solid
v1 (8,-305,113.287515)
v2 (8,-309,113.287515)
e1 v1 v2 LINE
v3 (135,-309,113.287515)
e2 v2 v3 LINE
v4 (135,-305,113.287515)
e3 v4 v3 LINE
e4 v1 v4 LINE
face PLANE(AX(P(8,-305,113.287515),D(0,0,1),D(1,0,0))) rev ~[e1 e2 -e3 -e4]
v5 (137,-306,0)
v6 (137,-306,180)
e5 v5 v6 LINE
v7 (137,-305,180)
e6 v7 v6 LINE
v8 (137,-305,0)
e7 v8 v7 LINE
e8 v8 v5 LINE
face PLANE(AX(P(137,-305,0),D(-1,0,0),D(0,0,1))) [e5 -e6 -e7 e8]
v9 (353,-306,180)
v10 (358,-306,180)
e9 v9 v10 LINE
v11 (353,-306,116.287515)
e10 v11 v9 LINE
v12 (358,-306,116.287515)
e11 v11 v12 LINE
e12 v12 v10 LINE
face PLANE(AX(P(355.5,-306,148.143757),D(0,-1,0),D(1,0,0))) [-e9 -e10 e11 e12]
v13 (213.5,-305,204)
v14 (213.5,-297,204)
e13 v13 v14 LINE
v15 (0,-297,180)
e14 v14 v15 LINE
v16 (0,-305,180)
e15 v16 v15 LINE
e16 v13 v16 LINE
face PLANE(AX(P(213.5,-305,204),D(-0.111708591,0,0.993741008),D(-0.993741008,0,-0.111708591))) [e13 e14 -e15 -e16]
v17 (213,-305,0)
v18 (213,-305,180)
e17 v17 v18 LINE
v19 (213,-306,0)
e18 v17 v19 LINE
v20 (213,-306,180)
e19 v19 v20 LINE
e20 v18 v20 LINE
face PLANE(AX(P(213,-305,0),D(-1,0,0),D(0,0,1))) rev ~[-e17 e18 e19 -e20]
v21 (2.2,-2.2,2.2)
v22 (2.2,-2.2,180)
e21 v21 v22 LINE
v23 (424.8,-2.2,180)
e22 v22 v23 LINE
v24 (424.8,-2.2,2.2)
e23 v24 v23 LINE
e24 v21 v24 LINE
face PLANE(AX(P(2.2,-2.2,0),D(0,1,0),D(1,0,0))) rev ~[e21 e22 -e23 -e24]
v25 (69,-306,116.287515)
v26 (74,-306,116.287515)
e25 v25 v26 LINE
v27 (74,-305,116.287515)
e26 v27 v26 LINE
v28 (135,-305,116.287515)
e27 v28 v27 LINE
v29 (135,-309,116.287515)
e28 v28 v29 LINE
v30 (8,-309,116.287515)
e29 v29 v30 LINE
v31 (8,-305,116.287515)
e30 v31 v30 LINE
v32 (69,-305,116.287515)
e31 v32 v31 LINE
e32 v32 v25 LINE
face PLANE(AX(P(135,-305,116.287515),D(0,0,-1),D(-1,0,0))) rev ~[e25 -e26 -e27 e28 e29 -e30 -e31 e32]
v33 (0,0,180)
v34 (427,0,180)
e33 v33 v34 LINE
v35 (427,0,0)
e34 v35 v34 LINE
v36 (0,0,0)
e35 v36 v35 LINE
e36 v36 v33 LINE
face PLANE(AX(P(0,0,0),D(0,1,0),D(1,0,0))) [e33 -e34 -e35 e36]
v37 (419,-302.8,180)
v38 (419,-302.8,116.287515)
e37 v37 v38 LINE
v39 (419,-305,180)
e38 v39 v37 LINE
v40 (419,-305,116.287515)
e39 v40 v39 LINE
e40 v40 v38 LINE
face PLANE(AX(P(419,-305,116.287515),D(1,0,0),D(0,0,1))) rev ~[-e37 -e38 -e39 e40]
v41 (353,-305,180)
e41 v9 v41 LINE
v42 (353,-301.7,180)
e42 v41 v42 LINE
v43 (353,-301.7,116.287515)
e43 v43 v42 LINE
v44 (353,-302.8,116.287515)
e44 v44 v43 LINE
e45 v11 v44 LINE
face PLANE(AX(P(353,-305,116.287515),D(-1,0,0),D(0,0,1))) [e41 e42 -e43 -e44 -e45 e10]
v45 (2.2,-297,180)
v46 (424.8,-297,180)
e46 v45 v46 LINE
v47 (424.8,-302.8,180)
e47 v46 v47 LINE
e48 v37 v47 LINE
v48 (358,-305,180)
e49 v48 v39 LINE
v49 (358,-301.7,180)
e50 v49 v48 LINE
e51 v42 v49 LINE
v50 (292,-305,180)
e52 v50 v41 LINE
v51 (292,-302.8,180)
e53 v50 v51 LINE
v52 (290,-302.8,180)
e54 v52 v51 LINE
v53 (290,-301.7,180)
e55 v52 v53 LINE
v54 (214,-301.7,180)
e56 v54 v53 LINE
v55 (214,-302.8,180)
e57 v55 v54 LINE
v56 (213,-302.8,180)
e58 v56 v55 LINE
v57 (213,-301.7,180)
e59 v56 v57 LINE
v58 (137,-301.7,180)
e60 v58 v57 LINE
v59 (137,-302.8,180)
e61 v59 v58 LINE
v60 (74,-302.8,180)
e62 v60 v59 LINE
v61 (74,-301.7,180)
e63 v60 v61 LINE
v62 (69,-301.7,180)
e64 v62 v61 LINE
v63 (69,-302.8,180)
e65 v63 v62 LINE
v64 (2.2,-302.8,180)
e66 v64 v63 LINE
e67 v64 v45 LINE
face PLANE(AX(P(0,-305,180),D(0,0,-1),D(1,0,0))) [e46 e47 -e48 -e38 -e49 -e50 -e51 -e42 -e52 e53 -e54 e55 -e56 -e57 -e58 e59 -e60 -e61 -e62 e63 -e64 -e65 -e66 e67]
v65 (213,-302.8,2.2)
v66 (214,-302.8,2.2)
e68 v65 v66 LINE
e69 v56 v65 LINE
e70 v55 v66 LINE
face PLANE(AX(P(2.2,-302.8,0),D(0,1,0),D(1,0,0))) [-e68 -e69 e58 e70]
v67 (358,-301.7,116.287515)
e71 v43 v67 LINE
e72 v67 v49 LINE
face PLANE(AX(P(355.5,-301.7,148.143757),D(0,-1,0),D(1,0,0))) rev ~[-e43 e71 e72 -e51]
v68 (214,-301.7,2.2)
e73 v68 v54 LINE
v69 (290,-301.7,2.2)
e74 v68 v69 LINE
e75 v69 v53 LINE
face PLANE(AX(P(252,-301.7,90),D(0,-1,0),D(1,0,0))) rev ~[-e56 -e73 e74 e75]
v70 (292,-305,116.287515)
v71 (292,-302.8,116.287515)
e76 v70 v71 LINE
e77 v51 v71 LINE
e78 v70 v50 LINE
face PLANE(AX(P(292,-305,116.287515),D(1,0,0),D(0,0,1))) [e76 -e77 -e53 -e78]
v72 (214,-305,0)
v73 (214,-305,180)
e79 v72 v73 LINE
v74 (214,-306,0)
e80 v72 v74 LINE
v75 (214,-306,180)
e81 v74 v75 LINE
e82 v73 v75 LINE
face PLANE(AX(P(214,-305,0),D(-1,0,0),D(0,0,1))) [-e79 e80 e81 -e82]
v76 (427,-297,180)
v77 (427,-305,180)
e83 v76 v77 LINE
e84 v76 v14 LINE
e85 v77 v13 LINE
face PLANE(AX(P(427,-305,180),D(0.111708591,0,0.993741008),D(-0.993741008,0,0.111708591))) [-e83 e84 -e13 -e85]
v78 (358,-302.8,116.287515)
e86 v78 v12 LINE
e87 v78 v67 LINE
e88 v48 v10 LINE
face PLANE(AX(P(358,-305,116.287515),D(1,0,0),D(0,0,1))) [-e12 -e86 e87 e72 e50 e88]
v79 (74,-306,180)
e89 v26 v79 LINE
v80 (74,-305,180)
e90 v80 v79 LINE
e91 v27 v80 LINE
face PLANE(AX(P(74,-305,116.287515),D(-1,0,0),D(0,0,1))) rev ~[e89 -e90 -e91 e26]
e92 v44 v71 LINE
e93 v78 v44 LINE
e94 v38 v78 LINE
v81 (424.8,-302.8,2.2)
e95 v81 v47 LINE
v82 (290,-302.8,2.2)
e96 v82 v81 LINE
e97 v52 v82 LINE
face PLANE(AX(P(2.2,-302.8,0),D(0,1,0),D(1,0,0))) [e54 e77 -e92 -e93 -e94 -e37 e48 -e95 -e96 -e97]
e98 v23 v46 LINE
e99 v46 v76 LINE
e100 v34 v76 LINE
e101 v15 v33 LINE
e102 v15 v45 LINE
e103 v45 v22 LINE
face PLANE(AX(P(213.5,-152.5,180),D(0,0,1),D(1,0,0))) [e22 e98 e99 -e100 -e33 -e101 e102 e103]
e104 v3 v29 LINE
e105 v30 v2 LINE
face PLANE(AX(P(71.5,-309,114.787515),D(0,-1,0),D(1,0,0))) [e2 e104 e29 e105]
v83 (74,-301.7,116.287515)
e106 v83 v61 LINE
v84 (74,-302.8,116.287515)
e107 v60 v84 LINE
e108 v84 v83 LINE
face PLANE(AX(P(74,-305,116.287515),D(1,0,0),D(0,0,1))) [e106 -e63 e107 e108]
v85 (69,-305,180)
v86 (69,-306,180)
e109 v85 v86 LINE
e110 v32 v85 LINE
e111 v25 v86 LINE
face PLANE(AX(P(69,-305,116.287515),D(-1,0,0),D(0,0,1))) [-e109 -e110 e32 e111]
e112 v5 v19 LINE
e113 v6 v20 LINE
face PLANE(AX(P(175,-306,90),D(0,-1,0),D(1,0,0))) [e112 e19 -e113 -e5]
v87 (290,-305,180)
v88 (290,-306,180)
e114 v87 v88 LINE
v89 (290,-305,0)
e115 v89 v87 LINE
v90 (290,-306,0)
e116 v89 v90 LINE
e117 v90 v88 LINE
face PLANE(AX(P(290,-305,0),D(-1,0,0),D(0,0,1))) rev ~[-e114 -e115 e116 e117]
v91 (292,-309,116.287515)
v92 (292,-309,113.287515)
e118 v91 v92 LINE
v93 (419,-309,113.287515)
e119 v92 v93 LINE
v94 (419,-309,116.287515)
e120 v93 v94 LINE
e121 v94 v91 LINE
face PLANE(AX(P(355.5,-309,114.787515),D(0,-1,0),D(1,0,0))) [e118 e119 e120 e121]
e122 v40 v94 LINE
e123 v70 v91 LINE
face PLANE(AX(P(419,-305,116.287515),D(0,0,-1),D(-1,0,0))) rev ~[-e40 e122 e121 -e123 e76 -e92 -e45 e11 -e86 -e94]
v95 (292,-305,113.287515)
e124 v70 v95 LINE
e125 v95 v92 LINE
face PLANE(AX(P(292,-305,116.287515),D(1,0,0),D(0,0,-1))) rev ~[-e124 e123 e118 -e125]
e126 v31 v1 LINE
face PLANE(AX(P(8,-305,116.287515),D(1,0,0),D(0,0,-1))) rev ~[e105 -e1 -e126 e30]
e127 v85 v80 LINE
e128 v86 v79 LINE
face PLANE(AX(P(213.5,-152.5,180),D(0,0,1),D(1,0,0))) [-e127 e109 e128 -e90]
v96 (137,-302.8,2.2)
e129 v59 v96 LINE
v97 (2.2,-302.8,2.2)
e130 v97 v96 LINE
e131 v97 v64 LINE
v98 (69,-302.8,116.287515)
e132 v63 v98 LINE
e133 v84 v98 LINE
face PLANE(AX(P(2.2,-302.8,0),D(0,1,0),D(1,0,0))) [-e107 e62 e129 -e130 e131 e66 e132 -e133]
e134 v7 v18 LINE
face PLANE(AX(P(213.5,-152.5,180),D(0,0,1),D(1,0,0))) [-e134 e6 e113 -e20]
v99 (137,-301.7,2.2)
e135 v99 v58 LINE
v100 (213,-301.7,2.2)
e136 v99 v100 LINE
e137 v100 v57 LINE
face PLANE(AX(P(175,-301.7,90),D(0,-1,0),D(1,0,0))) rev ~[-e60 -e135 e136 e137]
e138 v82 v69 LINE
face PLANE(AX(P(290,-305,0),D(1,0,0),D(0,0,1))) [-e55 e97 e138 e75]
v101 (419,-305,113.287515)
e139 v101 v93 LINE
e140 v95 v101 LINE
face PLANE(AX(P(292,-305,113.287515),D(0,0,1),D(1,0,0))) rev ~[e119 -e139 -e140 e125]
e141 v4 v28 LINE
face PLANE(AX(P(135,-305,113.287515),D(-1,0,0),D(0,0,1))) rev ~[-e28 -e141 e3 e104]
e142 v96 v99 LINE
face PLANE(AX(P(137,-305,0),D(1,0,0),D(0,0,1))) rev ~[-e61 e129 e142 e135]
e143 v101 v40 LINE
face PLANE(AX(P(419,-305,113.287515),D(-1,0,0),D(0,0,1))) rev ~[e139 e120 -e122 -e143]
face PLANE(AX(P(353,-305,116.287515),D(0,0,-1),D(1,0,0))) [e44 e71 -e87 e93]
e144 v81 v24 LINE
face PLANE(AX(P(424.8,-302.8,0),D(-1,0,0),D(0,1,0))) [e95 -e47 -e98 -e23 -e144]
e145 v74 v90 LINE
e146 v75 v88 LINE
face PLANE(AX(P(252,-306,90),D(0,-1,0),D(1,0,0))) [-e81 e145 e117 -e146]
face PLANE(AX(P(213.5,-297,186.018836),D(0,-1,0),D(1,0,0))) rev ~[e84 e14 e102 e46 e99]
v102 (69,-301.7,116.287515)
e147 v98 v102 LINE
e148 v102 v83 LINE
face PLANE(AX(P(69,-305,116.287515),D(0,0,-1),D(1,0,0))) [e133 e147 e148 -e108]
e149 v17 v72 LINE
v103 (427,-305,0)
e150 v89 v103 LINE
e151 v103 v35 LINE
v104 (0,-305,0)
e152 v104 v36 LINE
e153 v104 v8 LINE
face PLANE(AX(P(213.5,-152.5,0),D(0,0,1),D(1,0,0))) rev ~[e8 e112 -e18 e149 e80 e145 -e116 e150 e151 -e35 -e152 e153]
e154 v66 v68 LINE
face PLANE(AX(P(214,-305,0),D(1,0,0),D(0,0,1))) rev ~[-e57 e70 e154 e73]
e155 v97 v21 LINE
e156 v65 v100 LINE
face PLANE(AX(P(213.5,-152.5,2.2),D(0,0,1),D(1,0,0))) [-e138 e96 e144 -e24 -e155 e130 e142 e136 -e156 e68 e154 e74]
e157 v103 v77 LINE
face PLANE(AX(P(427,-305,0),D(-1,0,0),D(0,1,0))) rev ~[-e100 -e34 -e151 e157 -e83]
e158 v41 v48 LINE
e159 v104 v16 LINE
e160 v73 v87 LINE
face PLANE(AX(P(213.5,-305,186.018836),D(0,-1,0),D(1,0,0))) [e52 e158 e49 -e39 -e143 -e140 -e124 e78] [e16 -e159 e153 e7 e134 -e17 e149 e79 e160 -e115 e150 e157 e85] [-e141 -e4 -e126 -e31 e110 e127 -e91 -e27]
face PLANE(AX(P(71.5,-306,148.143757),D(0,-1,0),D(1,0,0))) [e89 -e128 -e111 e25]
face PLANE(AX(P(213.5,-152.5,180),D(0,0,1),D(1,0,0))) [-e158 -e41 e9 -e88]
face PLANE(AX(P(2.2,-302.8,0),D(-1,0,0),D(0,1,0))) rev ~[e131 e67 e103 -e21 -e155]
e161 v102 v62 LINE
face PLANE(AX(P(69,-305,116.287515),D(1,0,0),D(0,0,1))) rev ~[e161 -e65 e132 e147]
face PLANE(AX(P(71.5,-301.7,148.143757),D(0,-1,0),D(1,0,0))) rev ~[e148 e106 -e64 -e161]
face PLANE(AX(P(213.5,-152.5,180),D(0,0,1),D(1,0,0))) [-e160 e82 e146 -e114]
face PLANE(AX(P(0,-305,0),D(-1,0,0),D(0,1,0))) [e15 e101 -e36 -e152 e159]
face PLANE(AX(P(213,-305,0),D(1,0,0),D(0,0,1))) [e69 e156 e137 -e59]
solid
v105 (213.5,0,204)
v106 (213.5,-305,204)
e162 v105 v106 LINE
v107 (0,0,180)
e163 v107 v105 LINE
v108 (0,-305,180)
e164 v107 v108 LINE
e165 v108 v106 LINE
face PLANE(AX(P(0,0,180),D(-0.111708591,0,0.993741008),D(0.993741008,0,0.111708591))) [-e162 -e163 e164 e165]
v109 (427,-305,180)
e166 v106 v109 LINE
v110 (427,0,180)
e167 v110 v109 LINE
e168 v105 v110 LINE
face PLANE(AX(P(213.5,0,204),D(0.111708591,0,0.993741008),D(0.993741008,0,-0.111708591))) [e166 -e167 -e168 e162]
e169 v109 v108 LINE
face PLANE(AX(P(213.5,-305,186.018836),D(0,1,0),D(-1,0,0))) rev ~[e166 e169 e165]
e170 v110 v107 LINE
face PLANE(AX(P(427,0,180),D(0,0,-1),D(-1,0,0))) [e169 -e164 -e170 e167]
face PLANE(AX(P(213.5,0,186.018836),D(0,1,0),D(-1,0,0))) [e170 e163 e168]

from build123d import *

# Parameters (mm, degrees)
F0_W          = 427
F0_H          = 305
F0_W_2        = 422.6
F0_H_2        = 300.6
F1_DEPTH      = 180
F2_DEPTH      = 2.2
F3_W          = 76
F3_H          = 180
F3_W_2        = 5
F3_H_2        = 63.7124854326
F4_DEPTH      = 1
F4_DEPTH_BACK = 3.3
F3_W_3        = 61
F5_DEPTH      = 25
F6_DEPTH      = 8
F7_DEPTH      = 4
F9_DEPTH      = 305


# Not quite as in the source:
# - a feature names something its author has since deleted; it is built from what else it names
# - the program builds the solid bodies; features that only make, move or delete a surface that nothing else refers to are left out


with BuildPart() as f1:
    # F0 (on Top) → F1 (new body)
    with BuildSketch(Plane.XY):
        with Locations((213.5, -152.5)):
            Rectangle(F0_W, F0_H)
        with Locations((213.5, -152.5)):
            Rectangle(F0_W_2, F0_H_2, mode=Mode.SUBTRACT)
    extrude(amount=F1_DEPTH)

    # F0 (on Top) → F2 (join)
    with BuildSketch(Plane.XY):
        with Locations((213.5, -152.5)):
            Rectangle(F0_W_2, F0_H_2)
    extrude(amount=F2_DEPTH)

    # F3 (on face) → F4 (join, two sides)
    with BuildSketch(Plane.XZ.offset(305)) as f4_sk:
        with Locations((175, 90)):
            Rectangle(F3_W, F3_H)
        with Locations((252, 90)):
            Rectangle(F3_W, F3_H)
        with Locations((71.5, 148.1437572837)):
            Rectangle(F3_W_2, F3_H_2)
        with Locations((355.5, 148.1437572837)):
            Rectangle(F3_W_2, F3_H_2)
    extrude(amount=F4_DEPTH)
    extrude(f4_sk.sketch, amount=-F4_DEPTH_BACK)

    # F3 (on face) → F5 (cut)
    with BuildSketch(Plane.XZ.offset(305)):
        Polygon((135, 180), (137, 180), (213, 180), (214, 180), (290, 180), (292, 180), (353, 180), (358, 180), (419, 180), (427, 180), (213.5, 204), (0, 180), (8, 180), (69, 180), (74, 180), align=None)
        with Locations((322.5, 148.1437572837)):
            Rectangle(F3_W_3, F3_H_2)
        with Locations((388.5, 148.1437572837)):
            Rectangle(F3_W_3, F3_H_2)
    extrude(amount=-F5_DEPTH, mode=Mode.SUBTRACT)

    # F3 (on face) → F6 (join)
    with BuildSketch(Plane.XZ.offset(305)):
        Polygon((135, 180), (137, 180), (213, 180), (214, 180), (290, 180), (292, 180), (353, 180), (358, 180), (419, 180), (427, 180), (213.5, 204), (0, 180), (8, 180), (69, 180), (74, 180), align=None)
    extrude(amount=-F6_DEPTH)

    # F3 (on face) → F7 (join)
    with BuildSketch(Plane.XZ.offset(305)):
        Polygon((353, 116.2875145674), (292, 116.2875145674), (292, 113.2875145674), (419, 113.2875145674), (419, 116.2875145674), (358, 116.2875145674), align=None)
        Polygon((135, 113.2875145674), (135, 116.2875145674), (74, 116.2875145674), (69, 116.2875145674), (8, 116.2875145674), (8, 113.2875145674), align=None)
    extrude(amount=F7_DEPTH)


with BuildPart() as f9:
    # F8 (on face) → F9 (new body)
    with BuildSketch(Plane(origin=(0, 0, 0), x_dir=(-1, 0, 0), z_dir=(0, 1, 0))):
        Polygon((-213.5, 204), (-427, 180), (0, 180), align=None)
    extrude(amount=-F9_DEPTH)


solid = Compound([f1.part, f9.part])
